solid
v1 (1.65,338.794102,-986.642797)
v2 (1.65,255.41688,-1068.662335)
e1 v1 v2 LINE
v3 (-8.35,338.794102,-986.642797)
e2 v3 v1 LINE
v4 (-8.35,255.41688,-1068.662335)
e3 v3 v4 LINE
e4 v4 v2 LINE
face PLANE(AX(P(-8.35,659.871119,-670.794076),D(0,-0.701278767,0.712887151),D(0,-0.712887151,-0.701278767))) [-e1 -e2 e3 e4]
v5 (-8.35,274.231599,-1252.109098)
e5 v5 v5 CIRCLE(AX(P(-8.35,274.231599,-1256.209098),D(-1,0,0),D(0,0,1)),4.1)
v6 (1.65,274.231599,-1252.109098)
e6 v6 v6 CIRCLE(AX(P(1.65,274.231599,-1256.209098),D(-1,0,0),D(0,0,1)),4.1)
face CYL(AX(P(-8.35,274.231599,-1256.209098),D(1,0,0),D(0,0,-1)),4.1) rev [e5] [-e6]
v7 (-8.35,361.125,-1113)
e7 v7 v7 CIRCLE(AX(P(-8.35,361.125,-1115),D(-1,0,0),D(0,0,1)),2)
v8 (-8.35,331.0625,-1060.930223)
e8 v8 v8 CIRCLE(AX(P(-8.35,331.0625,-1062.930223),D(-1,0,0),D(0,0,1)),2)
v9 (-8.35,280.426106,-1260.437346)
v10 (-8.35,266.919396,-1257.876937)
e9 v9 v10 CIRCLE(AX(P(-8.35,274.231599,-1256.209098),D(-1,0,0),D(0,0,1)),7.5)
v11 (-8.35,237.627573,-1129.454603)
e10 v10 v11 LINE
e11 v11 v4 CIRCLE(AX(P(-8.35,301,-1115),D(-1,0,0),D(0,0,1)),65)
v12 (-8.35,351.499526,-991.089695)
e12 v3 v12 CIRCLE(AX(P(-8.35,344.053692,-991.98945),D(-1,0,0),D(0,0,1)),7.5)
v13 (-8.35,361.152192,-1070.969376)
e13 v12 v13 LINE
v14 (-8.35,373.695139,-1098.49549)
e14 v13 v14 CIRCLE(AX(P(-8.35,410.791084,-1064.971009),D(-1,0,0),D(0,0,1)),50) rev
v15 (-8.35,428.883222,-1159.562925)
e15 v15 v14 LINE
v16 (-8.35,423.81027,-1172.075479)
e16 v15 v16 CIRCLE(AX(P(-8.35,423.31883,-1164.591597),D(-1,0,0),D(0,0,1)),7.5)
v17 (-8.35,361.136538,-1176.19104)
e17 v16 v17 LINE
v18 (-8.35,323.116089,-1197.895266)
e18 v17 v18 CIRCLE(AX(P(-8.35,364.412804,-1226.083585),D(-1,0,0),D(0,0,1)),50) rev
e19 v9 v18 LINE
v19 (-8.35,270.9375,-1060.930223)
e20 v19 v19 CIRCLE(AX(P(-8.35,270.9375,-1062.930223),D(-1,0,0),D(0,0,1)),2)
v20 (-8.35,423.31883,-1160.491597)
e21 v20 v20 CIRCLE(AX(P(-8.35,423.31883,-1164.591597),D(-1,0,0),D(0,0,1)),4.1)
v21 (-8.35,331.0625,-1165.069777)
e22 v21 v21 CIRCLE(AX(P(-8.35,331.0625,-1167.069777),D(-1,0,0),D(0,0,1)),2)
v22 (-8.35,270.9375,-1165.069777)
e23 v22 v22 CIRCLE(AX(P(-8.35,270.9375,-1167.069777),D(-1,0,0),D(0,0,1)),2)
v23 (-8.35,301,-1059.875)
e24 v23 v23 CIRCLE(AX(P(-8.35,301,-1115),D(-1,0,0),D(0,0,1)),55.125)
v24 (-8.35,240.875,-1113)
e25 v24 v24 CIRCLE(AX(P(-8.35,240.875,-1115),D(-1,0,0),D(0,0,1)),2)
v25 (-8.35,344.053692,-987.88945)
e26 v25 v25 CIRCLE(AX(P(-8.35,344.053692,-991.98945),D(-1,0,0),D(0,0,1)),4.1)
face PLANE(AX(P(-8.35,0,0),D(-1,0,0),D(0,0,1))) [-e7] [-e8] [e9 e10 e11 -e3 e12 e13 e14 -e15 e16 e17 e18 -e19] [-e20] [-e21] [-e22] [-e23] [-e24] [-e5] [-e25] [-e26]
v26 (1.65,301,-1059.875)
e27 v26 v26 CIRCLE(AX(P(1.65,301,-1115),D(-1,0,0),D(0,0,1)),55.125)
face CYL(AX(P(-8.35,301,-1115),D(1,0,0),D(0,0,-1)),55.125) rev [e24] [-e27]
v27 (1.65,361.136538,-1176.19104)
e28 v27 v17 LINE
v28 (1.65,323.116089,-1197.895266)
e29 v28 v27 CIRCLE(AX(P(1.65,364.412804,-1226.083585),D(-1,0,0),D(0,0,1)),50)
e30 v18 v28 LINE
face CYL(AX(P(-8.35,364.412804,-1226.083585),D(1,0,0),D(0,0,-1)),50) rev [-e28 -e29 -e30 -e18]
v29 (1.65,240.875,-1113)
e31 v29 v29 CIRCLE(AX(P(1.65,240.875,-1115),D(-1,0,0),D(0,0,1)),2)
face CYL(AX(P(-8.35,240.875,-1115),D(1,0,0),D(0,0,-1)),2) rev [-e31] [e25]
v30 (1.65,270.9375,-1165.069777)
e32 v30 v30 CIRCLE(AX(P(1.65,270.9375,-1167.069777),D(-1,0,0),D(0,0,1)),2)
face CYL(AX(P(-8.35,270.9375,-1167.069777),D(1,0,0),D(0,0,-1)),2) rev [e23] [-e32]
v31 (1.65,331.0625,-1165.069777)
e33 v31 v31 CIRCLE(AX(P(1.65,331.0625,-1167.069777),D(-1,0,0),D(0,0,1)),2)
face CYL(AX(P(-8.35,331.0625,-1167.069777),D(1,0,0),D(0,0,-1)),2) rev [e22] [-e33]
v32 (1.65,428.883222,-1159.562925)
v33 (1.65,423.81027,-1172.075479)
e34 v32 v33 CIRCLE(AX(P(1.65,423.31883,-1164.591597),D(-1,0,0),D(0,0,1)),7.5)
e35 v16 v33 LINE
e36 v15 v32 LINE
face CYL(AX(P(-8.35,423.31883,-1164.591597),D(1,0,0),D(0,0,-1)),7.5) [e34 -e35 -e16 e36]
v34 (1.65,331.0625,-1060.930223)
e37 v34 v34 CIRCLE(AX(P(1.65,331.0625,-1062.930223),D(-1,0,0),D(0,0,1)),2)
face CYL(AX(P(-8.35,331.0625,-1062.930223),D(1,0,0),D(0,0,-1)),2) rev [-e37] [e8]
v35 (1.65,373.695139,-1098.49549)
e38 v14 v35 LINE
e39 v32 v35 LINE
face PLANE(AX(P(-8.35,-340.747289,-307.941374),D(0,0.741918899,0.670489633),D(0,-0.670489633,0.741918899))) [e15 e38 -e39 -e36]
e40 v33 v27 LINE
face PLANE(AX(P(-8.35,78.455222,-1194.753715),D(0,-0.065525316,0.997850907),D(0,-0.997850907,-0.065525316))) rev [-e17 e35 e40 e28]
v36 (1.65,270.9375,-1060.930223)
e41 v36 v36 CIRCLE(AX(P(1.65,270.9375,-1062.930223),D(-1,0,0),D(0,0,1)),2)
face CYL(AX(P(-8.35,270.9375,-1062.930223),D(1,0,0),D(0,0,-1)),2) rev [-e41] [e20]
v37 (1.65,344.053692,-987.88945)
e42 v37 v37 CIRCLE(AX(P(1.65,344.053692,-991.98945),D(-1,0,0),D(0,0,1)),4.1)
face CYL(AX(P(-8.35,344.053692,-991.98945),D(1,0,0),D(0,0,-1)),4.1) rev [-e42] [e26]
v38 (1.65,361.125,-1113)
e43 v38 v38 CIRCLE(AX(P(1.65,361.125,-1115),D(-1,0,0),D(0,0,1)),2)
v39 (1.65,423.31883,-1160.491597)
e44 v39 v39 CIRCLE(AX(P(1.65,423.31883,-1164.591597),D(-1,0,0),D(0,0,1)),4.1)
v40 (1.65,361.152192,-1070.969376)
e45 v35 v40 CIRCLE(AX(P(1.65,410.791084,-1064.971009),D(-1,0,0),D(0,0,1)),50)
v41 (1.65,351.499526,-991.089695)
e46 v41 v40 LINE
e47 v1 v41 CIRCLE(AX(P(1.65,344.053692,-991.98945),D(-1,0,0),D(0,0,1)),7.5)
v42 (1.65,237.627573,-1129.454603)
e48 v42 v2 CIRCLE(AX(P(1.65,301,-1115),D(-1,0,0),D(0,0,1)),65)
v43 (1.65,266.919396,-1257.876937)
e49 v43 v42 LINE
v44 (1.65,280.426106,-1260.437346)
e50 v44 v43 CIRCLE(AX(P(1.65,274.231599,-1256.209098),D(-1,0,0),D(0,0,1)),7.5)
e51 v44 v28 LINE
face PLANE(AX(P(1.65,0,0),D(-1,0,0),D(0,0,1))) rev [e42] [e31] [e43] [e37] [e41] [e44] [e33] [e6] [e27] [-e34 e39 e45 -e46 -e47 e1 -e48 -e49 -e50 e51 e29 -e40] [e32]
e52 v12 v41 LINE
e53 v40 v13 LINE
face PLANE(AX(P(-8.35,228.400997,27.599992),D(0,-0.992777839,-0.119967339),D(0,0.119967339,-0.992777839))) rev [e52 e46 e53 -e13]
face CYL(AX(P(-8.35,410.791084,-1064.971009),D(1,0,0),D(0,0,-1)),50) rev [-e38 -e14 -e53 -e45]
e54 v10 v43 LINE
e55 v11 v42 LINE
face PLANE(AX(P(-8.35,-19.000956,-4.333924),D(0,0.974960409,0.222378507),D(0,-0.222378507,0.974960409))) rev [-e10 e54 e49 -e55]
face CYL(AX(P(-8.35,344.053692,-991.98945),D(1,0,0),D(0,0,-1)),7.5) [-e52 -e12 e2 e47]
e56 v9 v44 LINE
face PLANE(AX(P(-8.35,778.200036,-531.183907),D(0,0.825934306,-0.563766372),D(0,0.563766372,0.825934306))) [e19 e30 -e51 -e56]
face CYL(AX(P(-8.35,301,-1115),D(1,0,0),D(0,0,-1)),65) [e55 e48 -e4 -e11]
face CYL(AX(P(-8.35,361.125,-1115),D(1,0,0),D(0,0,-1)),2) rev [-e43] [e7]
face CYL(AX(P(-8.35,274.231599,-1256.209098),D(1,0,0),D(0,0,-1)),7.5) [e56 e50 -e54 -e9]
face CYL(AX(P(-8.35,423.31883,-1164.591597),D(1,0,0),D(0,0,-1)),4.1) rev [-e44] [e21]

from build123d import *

# Parameters (mm, degrees)
BOSS_EXTRUDE1_OUTLINE_R = 55.125
BOSS_EXTRUDE1_DEPTH     = 10
FILLET1_R               = 50
SKETCH4_R               = 2
CUT_EXTRUDE1_DEPTH      = 1336.164989569
SKETCH5_R               = 4.1
CUT_EXTRUDE2_DEPTH      = 1336.164989569


# Read off the part's stored shape, not the designer's step: Boss-Extrude1
with BuildPart() as part:
    # Boss-Extrude1 outline → Boss-Extrude1 (new body)
    with BuildSketch(Plane.ZY.offset(-1.65)):
        with BuildLine():
            Line((-1257.876937074, 266.919395505), (-1129.454602927, 237.627573392))
            ThreePointArc((-1129.454602927, 237.627573392), (-1096.744938567, 238.616085951), (-1068.662335154, 255.416880135))
            Line((-1068.662335154, 255.416880135), (-986.642796778, 338.794101601))
            ThreePointArc((-986.642796778, 338.794101601), (-984.910512742, 346.53132054), (-991.089695369, 351.499526147))
            Line((-991.089695369, 351.499526147), (-1086.722744118, 363.055830047))
            Line((-1086.722744118, 363.055830047), (-1159.562924749, 428.883221767))
            ThreePointArc((-1159.562924749, 428.883221767), (-1167.409525964, 430.269317516), (-1172.0754788, 423.810269894))
            Line((-1172.0754788, 423.810269894), (-1177.78637409, 336.842019695))
            Line((-1177.78637409, 336.842019695), (-1260.437346066, 280.42610587))
            ThreePointArc((-1260.437346066, 280.42610587), (-1263.57786788, 272.834732614), (-1257.876937074, 266.919395505))
        make_face()
        with Locations((-1115, 301)):
            Circle(BOSS_EXTRUDE1_OUTLINE_R, mode=Mode.SUBTRACT)
    extrude(amount=BOSS_EXTRUDE1_DEPTH)

    # Fillet1
    fillet1_edges = [part.edges().sort_by_distance(p)[0] for p in [
        (-3.35, 336.842019695, -1177.78637409),
        (-3.35, 363.055830047, -1086.722744118),
    ]]
    fillet(fillet1_edges, radius=FILLET1_R)

    # Sketch4 → Cut-Extrude1 (cut, through all)
    with BuildSketch(Plane.ZY.offset(-1.65)):
        with Locations((-1062.930222597, 331.0625)):
            Circle(SKETCH4_R)
        with Locations((-1115, 361.125)):
            Circle(SKETCH4_R)
        with Locations((-1062.930222597, 270.9375)):
            Circle(SKETCH4_R)
        with Locations((-1115, 240.875)):
            Circle(SKETCH4_R)
        with Locations((-1167.069777403, 270.9375)):
            Circle(SKETCH4_R)
        with Locations((-1167.069777403, 331.0625)):
            Circle(SKETCH4_R)
    extrude(amount=CUT_EXTRUDE1_DEPTH, mode=Mode.SUBTRACT)

    # Sketch5 → Cut-Extrude2 (cut, through all)
    with BuildSketch(Plane.ZY.offset(-1.65)):
        with Locations((-1164.591596996, 423.318830027)):
            Circle(SKETCH5_R)
        with Locations((-991.989450415, 344.053692355)):
            Circle(SKETCH5_R)
        with Locations((-1256.209098275, 274.231598575)):
            Circle(SKETCH5_R)
    extrude(amount=CUT_EXTRUDE2_DEPTH, mode=Mode.SUBTRACT)


solid = part.part
